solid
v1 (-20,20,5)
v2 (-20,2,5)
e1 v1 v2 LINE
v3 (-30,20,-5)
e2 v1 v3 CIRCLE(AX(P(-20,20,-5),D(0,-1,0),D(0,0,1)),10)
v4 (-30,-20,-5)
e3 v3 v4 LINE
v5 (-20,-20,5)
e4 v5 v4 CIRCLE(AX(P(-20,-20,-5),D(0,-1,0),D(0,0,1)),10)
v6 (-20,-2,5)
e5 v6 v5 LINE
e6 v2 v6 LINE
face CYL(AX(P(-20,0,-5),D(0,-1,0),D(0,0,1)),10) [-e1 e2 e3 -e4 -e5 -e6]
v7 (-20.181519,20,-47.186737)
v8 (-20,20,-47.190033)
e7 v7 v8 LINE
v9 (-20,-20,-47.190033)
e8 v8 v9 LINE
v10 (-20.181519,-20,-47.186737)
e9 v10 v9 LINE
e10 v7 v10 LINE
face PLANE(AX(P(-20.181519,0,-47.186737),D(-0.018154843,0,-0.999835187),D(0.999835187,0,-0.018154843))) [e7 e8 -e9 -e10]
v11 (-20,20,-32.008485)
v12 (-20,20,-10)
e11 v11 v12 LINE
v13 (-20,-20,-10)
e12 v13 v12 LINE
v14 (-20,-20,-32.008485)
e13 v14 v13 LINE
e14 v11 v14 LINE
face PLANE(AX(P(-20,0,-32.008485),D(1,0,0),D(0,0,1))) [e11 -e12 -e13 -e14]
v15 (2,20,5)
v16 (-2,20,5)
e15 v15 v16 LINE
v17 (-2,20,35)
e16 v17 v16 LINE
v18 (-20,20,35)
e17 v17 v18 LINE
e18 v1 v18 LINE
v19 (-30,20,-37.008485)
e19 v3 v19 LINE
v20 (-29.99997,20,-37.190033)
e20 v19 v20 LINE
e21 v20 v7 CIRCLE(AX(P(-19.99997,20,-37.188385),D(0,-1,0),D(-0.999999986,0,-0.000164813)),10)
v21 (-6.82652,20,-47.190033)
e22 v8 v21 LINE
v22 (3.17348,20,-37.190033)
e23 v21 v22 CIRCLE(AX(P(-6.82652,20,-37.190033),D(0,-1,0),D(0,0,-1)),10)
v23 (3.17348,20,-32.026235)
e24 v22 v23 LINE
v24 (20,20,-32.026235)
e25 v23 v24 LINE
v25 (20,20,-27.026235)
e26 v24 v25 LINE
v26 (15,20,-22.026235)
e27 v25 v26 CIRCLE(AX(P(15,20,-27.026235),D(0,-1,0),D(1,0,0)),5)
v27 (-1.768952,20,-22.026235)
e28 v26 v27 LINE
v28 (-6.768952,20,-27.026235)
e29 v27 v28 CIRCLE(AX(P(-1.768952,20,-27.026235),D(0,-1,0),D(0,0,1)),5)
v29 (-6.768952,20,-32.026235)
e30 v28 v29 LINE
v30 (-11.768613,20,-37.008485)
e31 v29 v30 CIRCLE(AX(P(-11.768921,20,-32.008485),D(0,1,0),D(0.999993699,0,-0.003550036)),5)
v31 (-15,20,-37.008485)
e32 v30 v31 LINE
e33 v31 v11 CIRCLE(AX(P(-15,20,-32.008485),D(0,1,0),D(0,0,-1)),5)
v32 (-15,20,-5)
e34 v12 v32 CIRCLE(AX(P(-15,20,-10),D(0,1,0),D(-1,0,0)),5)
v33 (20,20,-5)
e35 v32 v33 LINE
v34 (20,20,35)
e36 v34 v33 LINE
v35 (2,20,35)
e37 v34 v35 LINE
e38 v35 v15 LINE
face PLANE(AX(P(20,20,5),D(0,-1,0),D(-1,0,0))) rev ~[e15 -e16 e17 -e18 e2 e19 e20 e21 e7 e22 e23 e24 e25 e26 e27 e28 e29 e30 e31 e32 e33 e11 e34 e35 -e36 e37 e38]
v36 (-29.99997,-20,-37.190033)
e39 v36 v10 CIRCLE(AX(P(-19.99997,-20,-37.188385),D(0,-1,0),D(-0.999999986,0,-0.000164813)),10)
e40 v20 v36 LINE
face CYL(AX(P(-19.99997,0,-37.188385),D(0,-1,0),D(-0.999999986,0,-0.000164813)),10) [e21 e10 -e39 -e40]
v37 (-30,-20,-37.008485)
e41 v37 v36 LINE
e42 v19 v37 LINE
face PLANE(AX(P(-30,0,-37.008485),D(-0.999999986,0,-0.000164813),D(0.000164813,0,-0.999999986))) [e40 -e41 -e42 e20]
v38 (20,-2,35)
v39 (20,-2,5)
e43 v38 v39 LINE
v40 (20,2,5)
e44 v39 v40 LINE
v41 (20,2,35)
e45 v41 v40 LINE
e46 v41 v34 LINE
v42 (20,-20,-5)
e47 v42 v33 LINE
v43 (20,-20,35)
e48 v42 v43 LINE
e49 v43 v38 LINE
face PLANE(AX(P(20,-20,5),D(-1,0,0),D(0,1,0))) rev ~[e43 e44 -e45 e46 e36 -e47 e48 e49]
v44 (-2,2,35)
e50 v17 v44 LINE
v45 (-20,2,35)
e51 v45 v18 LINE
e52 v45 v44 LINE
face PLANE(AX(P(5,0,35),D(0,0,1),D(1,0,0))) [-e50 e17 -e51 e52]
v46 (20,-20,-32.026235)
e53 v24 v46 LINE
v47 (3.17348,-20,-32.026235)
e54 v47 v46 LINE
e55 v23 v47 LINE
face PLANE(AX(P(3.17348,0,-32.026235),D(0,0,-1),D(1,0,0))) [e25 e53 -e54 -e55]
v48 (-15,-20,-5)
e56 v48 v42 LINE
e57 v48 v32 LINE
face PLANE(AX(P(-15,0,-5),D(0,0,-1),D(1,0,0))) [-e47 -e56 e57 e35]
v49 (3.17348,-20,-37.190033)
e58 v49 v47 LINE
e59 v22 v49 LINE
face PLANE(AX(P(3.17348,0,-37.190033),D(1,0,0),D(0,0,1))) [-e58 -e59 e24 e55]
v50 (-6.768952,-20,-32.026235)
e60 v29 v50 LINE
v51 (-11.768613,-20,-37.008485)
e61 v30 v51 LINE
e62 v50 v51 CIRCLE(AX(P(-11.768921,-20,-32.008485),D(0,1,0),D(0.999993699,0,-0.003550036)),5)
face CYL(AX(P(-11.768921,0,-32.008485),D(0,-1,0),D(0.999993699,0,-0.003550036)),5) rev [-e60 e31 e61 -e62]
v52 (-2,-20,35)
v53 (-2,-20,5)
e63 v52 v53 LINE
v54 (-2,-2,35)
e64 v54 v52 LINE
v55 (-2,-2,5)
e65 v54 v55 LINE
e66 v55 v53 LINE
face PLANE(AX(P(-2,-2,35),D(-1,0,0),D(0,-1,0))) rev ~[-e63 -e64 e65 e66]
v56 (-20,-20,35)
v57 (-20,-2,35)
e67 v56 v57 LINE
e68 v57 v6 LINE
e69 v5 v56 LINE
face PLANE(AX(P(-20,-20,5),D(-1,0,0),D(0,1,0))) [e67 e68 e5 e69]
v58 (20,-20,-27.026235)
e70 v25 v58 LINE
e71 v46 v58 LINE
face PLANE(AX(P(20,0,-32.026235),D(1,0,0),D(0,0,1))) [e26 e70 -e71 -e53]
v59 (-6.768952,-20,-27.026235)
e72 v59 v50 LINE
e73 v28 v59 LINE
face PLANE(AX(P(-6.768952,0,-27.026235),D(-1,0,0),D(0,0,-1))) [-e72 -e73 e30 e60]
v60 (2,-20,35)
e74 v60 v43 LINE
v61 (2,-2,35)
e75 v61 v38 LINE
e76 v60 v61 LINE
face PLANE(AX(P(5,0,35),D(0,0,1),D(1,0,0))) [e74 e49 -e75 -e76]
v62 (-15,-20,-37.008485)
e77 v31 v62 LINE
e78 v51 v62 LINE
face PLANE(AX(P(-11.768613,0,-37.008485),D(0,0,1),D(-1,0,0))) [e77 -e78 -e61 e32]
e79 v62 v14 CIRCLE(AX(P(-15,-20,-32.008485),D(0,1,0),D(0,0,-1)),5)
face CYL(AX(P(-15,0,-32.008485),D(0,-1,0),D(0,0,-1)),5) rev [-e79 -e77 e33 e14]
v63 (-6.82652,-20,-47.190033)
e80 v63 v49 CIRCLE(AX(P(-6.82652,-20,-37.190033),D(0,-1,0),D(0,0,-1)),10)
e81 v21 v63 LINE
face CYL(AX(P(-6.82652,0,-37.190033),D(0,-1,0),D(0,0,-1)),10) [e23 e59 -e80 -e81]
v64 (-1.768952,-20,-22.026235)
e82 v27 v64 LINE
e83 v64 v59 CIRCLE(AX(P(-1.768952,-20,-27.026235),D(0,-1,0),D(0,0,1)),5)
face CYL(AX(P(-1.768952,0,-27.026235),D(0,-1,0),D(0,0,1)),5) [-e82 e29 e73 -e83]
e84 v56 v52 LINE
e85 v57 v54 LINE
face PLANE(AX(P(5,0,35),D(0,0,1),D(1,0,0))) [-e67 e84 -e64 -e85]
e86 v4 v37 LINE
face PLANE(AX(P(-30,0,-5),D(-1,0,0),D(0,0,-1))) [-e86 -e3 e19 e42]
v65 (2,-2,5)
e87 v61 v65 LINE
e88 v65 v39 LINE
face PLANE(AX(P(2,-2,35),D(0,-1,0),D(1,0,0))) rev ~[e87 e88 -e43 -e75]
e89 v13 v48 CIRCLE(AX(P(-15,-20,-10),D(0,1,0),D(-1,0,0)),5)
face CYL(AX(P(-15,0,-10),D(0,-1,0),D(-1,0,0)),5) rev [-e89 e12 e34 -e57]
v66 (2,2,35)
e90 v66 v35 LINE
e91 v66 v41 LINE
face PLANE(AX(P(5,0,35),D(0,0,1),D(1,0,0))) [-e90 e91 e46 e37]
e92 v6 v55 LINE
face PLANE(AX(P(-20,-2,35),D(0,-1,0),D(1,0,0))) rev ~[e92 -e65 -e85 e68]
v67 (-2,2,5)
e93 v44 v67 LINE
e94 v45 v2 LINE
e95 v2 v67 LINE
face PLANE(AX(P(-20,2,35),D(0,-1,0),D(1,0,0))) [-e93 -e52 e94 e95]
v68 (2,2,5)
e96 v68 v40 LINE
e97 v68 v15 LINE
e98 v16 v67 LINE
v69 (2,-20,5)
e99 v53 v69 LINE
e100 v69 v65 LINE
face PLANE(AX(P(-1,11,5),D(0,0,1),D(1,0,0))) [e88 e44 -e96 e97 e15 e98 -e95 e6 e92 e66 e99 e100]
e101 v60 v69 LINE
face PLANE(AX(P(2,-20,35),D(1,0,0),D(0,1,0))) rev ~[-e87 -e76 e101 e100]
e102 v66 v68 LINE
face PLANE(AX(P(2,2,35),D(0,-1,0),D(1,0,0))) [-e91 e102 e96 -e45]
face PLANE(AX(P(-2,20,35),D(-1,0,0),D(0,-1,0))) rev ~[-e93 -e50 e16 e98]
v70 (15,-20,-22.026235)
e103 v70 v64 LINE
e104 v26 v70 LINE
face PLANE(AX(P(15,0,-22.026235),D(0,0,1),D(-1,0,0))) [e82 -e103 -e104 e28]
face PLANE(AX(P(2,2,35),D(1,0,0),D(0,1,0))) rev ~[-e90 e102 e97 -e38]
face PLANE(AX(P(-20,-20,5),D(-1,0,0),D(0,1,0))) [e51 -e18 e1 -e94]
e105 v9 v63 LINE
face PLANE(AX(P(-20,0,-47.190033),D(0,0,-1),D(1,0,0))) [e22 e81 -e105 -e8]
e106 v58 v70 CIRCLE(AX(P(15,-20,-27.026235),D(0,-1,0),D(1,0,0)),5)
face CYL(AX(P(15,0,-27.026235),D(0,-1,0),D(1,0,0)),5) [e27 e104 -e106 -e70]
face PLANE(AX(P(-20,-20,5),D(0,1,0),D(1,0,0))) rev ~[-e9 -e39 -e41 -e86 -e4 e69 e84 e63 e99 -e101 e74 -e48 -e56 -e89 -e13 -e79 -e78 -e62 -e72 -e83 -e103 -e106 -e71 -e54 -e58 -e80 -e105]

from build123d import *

# Parameters (mm, degrees)
F1_DEPTH = 20
F2_W     = 10
F2_H     = 40
F3_DEPTH = 30
F4_W     = 2
F4_H     = 18
F4_H_2   = 2
F4_W_2   = 18
F5_DEPTH = 30


# Not quite as in the source:
# - a feature names something its author has since deleted; it is built from what else it names


with BuildPart() as f1:
    # F0 (on Front) → F1 (new body, symmetric)
    with BuildSketch(Plane.XZ):
        with BuildLine():
            Line((-10, -5), (20, -5))
            Line((20, -5), (20, 5))
            Line((20, 5), (-20, 5))
            ThreePointArc((-20, 5), (-27.0710678119, 2.0710678119), (-30, -5))
            Line((-30, -5), (-30, -37.0084848255))
            Line((-30, -37.0084848255), (-29.9999700785, -37.1900333921))
            ThreePointArc((-29.9999700785, -37.1900333921), (-27.134358967, -44.1955599538), (-20.1815186475, -47.1867371371))
            Line((-20.1815186475, -47.1867371371), (-20, -47.1900331229))
            Line((-20, -47.1900331229), (-10, -47.1900331229))
            Line((-10, -47.1900331229), (-6.8265195005, -47.1900331229))
            ThreePointArc((-6.8265195005, -47.1900331229), (0.2445483114, -44.2611009348), (3.1734804995, -37.1900331229))
            Line((3.1734804995, -37.1900331229), (3.1734804995, -32.0262350142))
            Line((3.1734804995, -32.0262350142), (20, -32.0262350142))
            Line((20, -32.0262350142), (20, -27.0262350142))
            ThreePointArc((20, -27.0262350142), (18.5355339059, -23.4907011083), (15, -22.0262350142))
            Line((15, -22.0262350142), (3.1734804995, -22.0262350142))
            Line((3.1734804995, -22.0262350142), (-1.7689520504, -22.0262350142))
            ThreePointArc((-1.7689520504, -22.0262350142), (-5.3044859563, -23.4907011083), (-6.7689520504, -27.0262350142))
            Line((-6.7689520504, -27.0262350142), (-6.7689520504, -32.0262350142))
            ThreePointArc((-6.7689520504, -32.0262350142), (-8.2395588674, -35.5501802143), (-11.7686128262, -37.0084848255))
            Line((-11.7686128262, -37.0084848255), (-15, -37.0084848255))
            ThreePointArc((-15, -37.0084848255), (-18.5355339059, -35.5440187314), (-20, -32.0084848255))
            Line((-20, -32.0084848255), (-20, -15))
            Line((-20, -15), (-20, -10))
            ThreePointArc((-20, -10), (-18.5355339059, -6.4644660941), (-15, -5))
            Line((-15, -5), (-10, -5))
        make_face()
    extrude(amount=F1_DEPTH, both=True)

    # F2 (on face) → F3 (join)
    with BuildSketch(Plane.XY.offset(5)):
        with Locations((5, 0)):
            Rectangle(F2_W, F2_H)
        with Locations((-5, 0)):
            Rectangle(F2_W, F2_H)
        with Locations((-15, 0)):
            Rectangle(F2_W, F2_H)
        with Locations((15, 0)):
            Rectangle(F2_W, F2_H)
    extrude(amount=F3_DEPTH)

    # F4 (on face) → F5 (cut)
    with BuildSketch(Plane.XY.offset(35)):
        with Locations((-1, 11)):
            Rectangle(F4_W, F4_H)
        with Locations((-1, 1)):
            Rectangle(F4_W, F4_H_2)
        with Locations((-1, -1)):
            Rectangle(F4_W, F4_H_2)
        with Locations((-1, -11)):
            Rectangle(F4_W, F4_H)
        with Locations((1, 11)):
            Rectangle(F4_W, F4_H)
        with Locations((1, 1)):
            Rectangle(F4_W, F4_H_2)
        with Locations((1, -1)):
            Rectangle(F4_W, F4_H_2)
        with Locations((1, -11)):
            Rectangle(F4_W, F4_H)
        with Locations((11, 1)):
            Rectangle(F4_W_2, F4_H_2)
        with Locations((11, -1)):
            Rectangle(F4_W_2, F4_H_2)
        with Locations((-11, -1)):
            Rectangle(F4_W_2, F4_H_2)
        with Locations((-11, 1)):
            Rectangle(F4_W_2, F4_H_2)
    extrude(amount=-F5_DEPTH, mode=Mode.SUBTRACT)


solid = f1.part
